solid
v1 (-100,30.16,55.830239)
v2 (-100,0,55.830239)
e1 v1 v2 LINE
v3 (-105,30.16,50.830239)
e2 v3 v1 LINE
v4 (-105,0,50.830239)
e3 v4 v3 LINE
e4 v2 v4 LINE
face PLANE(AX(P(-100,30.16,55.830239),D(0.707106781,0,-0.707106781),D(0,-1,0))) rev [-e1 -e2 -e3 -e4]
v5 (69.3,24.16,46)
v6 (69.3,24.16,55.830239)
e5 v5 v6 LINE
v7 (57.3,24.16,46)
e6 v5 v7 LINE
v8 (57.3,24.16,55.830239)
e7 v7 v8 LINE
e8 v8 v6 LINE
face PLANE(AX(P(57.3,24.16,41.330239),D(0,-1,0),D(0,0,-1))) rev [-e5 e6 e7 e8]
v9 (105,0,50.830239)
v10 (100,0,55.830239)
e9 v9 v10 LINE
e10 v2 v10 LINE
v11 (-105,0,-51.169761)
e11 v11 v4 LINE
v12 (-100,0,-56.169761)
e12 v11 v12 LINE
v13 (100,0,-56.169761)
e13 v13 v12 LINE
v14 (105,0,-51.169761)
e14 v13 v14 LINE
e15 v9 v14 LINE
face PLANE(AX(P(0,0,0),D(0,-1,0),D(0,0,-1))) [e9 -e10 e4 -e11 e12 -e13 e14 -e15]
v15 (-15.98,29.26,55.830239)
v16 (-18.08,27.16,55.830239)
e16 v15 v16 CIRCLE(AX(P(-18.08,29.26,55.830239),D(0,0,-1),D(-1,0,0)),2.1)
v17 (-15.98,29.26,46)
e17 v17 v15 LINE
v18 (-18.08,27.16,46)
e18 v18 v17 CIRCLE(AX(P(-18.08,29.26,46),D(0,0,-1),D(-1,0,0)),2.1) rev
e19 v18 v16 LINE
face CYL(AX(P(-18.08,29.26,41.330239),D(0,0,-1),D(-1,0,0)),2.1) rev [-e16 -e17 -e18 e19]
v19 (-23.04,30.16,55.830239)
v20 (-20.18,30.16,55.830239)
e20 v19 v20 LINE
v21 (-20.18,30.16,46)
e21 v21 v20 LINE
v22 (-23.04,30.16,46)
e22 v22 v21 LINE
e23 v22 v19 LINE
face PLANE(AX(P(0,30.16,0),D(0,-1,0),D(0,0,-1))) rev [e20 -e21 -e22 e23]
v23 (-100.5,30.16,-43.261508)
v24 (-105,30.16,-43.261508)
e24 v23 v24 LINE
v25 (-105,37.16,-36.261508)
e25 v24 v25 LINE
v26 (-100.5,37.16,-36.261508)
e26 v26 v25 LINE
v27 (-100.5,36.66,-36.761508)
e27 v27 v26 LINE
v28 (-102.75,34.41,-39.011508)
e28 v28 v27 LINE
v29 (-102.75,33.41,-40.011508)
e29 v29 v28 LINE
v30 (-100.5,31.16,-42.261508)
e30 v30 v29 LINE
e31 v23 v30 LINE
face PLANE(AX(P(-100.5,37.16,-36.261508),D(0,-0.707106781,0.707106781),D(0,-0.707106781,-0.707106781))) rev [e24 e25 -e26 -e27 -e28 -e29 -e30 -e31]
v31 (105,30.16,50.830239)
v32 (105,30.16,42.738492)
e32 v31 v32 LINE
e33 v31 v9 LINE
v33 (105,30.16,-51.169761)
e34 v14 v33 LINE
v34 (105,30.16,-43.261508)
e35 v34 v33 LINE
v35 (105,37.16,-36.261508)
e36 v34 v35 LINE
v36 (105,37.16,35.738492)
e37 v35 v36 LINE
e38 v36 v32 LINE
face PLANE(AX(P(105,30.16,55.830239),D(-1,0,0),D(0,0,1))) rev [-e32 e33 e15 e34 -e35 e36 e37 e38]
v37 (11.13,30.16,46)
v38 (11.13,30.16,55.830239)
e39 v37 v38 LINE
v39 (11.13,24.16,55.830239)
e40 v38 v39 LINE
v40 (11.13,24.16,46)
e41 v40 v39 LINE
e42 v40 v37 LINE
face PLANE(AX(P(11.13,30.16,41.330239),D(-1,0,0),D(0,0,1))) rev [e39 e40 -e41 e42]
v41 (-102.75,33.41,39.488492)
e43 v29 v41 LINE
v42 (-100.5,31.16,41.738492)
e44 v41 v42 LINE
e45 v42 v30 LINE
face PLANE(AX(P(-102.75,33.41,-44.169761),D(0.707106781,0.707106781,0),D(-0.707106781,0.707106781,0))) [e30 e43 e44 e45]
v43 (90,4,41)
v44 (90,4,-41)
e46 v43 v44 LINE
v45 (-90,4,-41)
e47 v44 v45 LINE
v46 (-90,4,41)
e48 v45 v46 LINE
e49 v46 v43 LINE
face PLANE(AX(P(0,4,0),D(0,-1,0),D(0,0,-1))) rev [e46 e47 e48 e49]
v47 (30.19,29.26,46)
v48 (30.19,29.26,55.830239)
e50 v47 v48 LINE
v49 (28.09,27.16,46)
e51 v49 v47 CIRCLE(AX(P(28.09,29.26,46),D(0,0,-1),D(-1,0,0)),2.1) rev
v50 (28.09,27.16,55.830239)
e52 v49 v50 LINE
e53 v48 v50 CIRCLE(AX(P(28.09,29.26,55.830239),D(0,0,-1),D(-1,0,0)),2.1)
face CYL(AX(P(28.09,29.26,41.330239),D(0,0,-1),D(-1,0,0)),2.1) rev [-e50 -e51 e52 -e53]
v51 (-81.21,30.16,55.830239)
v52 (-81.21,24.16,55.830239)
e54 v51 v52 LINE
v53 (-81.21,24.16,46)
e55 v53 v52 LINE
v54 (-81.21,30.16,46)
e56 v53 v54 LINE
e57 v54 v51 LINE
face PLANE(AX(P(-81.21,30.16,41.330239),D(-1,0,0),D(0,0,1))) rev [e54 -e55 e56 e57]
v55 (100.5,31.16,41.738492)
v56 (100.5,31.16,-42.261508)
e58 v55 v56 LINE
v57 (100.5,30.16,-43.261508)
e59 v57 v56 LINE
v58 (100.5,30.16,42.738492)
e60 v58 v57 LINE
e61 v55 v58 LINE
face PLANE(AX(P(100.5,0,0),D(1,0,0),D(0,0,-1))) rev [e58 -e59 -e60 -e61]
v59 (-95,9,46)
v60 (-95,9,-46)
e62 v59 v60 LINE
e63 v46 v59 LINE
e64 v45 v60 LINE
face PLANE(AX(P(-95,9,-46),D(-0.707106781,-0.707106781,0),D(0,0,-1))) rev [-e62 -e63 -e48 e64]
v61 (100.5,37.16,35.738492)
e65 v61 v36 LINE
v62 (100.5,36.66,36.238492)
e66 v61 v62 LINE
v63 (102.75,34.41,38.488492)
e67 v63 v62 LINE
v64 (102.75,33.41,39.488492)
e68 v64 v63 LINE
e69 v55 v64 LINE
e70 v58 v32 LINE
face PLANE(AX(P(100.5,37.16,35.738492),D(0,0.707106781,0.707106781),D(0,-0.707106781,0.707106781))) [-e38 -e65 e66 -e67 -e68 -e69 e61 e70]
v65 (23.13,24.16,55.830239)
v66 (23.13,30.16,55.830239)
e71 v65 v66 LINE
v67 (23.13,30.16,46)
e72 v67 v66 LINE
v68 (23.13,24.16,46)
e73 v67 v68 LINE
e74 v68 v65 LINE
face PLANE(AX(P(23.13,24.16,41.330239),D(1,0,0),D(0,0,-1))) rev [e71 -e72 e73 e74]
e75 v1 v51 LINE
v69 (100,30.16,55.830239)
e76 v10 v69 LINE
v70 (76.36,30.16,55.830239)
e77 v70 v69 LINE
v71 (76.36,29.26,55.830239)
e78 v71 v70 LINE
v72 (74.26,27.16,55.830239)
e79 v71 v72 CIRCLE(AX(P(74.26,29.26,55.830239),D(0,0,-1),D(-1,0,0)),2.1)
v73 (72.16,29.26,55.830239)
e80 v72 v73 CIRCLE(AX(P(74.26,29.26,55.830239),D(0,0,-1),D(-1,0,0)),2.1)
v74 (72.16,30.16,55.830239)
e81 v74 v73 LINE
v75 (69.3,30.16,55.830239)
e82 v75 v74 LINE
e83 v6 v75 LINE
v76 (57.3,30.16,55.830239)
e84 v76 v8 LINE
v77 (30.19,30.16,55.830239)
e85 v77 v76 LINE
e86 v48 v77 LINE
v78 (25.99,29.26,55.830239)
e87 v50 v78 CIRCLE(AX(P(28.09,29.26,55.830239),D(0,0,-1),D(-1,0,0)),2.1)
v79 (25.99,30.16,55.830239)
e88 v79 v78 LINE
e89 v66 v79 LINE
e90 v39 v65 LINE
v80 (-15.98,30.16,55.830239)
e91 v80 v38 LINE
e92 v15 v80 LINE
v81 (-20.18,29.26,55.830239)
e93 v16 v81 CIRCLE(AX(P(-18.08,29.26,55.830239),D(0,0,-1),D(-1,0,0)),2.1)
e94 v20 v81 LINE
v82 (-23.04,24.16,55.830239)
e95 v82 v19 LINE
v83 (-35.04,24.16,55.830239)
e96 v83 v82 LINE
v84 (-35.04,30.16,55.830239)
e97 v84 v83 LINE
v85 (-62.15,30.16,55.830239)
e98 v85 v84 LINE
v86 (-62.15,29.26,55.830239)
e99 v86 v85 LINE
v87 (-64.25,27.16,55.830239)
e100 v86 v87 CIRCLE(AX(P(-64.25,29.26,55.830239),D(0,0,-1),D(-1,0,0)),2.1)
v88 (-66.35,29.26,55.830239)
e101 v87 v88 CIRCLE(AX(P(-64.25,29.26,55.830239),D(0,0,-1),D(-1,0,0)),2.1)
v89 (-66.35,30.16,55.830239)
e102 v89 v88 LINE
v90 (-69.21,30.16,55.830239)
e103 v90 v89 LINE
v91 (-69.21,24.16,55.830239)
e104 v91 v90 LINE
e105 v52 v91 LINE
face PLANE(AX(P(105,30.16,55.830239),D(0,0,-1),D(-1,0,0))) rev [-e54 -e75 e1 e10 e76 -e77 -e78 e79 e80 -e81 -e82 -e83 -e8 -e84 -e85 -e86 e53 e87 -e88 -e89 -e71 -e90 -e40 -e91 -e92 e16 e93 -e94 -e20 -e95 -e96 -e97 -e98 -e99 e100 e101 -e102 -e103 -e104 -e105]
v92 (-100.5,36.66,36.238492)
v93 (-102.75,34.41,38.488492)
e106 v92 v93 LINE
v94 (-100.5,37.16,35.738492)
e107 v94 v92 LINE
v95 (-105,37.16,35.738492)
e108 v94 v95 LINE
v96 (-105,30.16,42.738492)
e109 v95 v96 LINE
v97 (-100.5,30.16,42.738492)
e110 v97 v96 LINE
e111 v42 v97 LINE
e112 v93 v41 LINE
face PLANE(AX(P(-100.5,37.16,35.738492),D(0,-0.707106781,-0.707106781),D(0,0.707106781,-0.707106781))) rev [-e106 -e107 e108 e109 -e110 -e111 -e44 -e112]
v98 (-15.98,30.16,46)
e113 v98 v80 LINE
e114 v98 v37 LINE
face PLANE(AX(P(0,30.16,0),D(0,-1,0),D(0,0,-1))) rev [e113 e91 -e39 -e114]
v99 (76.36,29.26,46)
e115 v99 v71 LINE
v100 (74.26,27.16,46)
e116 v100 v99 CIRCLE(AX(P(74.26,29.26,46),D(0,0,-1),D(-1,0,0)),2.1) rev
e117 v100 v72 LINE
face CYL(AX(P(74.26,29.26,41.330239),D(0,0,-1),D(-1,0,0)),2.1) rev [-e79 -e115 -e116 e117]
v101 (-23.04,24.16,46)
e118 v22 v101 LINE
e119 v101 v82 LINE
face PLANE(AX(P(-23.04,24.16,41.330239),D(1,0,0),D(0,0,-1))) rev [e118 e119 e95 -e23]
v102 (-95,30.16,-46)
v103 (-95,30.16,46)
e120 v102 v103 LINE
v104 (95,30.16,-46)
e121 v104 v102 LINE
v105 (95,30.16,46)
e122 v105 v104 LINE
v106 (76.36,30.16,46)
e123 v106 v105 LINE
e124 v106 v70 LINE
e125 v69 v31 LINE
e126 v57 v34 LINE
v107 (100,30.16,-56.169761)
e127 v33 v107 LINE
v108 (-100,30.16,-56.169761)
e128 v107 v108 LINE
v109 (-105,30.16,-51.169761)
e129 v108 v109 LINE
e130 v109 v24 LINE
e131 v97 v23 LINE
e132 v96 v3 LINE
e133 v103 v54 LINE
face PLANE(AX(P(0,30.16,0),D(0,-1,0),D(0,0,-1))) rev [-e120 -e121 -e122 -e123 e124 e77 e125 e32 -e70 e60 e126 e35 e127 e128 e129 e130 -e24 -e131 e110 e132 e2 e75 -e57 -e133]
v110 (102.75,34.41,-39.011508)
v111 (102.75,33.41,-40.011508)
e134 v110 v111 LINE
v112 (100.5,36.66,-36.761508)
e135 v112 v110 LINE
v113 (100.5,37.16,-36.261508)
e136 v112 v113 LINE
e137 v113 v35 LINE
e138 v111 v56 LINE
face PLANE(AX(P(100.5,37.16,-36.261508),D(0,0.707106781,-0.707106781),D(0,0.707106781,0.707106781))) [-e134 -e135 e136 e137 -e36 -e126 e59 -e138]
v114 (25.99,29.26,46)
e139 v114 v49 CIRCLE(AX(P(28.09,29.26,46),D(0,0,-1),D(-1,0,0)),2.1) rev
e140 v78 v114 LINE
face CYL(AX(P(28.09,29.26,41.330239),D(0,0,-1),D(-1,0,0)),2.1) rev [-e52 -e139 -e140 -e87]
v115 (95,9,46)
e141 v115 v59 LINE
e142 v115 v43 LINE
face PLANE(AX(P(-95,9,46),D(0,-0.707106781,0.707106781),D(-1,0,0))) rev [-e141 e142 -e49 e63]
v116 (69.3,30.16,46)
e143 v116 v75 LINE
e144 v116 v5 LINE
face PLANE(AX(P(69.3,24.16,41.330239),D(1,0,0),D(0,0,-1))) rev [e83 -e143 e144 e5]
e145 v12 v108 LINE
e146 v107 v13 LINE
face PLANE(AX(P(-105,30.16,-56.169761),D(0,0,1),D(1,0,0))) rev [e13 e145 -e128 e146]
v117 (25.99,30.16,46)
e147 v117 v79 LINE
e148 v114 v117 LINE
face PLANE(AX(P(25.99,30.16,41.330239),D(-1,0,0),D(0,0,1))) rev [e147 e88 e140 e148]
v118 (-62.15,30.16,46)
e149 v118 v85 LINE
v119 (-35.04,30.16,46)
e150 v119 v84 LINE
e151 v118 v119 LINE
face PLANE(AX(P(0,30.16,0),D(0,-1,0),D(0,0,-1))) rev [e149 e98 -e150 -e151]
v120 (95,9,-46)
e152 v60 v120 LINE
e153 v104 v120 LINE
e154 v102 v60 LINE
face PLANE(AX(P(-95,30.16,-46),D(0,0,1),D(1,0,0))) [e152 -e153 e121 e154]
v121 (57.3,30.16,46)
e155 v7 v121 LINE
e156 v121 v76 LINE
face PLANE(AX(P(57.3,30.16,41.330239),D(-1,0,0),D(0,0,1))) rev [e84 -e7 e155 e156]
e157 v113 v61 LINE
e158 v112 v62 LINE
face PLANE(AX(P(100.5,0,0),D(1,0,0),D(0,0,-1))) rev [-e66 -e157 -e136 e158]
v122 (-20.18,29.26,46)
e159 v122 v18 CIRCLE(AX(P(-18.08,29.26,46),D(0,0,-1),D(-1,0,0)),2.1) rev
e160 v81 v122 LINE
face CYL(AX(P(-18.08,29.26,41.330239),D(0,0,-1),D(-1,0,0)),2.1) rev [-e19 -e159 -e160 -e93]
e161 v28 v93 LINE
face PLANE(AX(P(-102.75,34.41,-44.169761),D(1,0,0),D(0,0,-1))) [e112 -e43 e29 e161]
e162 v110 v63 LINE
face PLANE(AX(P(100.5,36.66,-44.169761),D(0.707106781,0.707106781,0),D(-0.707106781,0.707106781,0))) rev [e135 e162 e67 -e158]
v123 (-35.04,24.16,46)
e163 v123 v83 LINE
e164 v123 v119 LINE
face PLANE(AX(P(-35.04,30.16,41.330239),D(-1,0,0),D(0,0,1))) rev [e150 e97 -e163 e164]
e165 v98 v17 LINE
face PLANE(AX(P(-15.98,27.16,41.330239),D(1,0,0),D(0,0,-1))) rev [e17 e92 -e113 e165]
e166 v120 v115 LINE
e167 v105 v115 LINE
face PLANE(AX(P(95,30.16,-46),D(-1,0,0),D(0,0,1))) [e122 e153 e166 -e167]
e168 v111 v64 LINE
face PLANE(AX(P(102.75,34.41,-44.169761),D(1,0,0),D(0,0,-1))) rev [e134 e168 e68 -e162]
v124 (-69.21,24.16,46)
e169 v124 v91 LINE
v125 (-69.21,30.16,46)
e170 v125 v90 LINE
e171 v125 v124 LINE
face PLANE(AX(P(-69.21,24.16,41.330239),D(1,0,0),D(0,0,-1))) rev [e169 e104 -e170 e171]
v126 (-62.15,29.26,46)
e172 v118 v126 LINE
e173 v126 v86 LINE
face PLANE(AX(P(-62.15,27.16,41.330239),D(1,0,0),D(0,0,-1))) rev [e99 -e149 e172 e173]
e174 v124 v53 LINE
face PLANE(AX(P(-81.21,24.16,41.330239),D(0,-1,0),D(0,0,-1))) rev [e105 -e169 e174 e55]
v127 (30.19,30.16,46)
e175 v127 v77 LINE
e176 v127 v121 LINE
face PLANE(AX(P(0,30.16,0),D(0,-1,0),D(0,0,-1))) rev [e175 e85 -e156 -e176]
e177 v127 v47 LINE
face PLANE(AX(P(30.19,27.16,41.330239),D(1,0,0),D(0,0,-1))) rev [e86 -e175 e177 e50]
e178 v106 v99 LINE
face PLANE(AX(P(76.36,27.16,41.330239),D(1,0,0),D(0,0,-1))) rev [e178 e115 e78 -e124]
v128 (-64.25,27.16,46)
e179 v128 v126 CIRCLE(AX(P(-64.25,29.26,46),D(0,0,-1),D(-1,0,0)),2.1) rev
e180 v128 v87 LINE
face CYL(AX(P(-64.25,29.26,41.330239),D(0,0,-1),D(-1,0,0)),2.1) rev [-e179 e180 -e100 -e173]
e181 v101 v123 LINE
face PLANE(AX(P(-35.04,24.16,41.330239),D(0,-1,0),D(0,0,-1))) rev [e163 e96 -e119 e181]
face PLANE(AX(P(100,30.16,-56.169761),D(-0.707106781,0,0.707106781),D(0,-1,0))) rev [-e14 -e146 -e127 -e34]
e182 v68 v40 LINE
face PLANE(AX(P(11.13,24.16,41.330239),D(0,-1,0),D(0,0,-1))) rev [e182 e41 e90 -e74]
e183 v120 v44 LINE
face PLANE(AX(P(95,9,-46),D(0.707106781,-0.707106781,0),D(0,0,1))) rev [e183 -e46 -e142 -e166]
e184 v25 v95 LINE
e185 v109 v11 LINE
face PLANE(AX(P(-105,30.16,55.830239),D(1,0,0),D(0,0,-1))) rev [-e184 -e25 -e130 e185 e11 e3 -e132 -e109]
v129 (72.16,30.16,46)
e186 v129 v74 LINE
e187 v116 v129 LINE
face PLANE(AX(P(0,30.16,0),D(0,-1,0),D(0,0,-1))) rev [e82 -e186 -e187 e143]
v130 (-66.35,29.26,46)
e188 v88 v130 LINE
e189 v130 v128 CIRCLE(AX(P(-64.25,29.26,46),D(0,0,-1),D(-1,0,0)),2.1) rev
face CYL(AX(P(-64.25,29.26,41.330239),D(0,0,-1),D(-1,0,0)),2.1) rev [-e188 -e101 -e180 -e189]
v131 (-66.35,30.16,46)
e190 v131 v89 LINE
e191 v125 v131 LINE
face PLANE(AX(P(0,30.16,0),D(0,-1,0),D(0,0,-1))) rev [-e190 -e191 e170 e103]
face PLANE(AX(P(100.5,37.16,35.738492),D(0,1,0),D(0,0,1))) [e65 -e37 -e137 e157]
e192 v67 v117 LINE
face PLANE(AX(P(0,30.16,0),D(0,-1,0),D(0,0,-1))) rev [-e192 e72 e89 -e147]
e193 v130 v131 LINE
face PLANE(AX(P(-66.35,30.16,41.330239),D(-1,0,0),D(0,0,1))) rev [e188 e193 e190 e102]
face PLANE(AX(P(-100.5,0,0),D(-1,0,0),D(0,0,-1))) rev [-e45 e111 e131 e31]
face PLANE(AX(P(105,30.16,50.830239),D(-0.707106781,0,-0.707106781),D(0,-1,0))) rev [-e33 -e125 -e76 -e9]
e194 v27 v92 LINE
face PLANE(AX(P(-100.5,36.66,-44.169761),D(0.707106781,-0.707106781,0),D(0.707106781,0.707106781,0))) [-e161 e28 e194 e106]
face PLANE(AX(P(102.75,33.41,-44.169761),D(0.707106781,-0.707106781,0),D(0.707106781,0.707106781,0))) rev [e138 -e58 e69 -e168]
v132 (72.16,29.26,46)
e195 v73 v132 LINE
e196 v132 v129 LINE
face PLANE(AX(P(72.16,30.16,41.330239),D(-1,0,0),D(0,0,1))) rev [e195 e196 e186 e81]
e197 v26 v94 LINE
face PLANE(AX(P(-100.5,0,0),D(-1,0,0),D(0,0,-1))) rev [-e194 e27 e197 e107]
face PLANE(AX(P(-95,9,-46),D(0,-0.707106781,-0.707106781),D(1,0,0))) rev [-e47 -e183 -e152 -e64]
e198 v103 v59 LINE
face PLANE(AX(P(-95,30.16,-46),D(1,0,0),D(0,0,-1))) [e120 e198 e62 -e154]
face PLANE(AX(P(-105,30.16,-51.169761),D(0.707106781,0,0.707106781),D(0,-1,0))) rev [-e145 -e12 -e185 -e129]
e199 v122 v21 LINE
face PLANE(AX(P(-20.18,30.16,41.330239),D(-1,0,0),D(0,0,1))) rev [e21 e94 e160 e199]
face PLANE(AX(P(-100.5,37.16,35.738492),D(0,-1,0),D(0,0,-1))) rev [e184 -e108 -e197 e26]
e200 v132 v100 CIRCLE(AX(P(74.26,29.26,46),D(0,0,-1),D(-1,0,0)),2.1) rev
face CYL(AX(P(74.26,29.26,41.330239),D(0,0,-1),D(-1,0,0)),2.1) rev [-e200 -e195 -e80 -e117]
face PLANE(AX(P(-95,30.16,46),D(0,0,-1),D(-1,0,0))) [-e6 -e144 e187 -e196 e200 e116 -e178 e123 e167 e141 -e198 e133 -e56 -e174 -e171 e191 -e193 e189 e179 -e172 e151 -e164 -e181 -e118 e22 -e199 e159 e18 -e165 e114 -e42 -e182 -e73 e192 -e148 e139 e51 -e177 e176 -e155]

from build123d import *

# Parameters (mm, degrees)
SKETCH1_W           = 210
SKETCH1_H           = 112
SKETCH1_W_2         = 190
SKETCH1_H_2         = 92
BOSS_EXTRUDE1_DEPTH = 30.16
SKETCH2_W           = 210
SKETCH2_H           = 112
BOSS_EXTRUDE2_DEPTH = 4
BOSS_EXTRUDE3_DEPTH = 4.5
SKETCH5_W           = 12
SKETCH5_H           = 6
CUT_EXTRUDE2_DEPTH  = 14.5
SKETCH6_W           = 4.2
SKETCH6_H           = 3
CUT_EXTRUDE3_DEPTH  = 14.5
CHAMFER1_SIZE       = 5
CHAMFER2_SIZE       = 5
CUT_EXTRUDE4_DEPTH  = 100
FILLET1_R           = 2.1


with BuildPart() as part:
    # Sketch1 → Boss-Extrude1 (new body)
    with BuildSketch(Plane(origin=(0, 0, 0), x_dir=(1, 0, 0), z_dir=(0, 1, 0))):
        with Locations((0, 0.169761006)):
            Rectangle(SKETCH1_W, SKETCH1_H)
        Rectangle(SKETCH1_W_2, SKETCH1_H_2, mode=Mode.SUBTRACT)
    extrude(amount=BOSS_EXTRUDE1_DEPTH)

    # Sketch2 → Boss-Extrude2 (add)
    with BuildSketch(Plane.XZ):
        with Locations((0, -0.169761006)):
            Rectangle(SKETCH2_W, SKETCH2_H)
    extrude(amount=-BOSS_EXTRUDE2_DEPTH)

    # Sketch3 → Boss-Extrude3 (add)
    with BuildSketch(Plane(origin=(105, 0, 0), x_dir=(0, 0, -1), z_dir=(1, 0, 0))):
        Polygon((-42.738491713, 30.16), (43.261508287, 30.16), (36.261508287, 37.16), (-35.738491713, 37.16), align=None)
    boss_extrude3 = extrude(amount=-BOSS_EXTRUDE3_DEPTH)

    # Sketch5 → Cut-Extrude2 (cut)
    with BuildSketch(Plane.XY.offset(55.830238994)):
        with Locations((63.3, 27.16)):
            Rectangle(SKETCH5_W, SKETCH5_H)
        with Locations((17.13, 27.16)):
            Rectangle(SKETCH5_W, SKETCH5_H)
        with Locations((-29.04, 27.16)):
            Rectangle(SKETCH5_W, SKETCH5_H)
        with Locations((-75.21, 27.16)):
            Rectangle(SKETCH5_W, SKETCH5_H)
    extrude(amount=-CUT_EXTRUDE2_DEPTH, mode=Mode.SUBTRACT)

    # Sketch6 → Cut-Extrude3 (cut)
    with BuildSketch(Plane.XY.offset(55.830238994)):
        with Locations((-64.25, 28.66)):
            Rectangle(SKETCH6_W, SKETCH6_H)
        with Locations((-18.08, 28.66)):
            Rectangle(SKETCH6_W, SKETCH6_H)
        with Locations((28.09, 28.66)):
            Rectangle(SKETCH6_W, SKETCH6_H)
        with Locations((74.26, 28.66)):
            Rectangle(SKETCH6_W, SKETCH6_H)
    extrude(amount=-CUT_EXTRUDE3_DEPTH, mode=Mode.SUBTRACT)

    # Chamfer1
    chamfer1_edges = [part.edges().sort_by_distance(p)[0] for p in [
        (0, 4, -46),
        (0, 4, 46),
        (-95, 4, 0),
        (95, 4, 0),
    ]]
    chamfer(chamfer1_edges, length=CHAMFER1_SIZE)

    # Chamfer2
    chamfer2_edges = [part.edges().sort_by_distance(p)[0] for p in [
        (105, 15.08, 55.830238994),
        (-105, 15.08, 55.830238994),
        (-105, 15.08, -56.169761006),
        (105, 15.08, -56.169761006),
    ]]
    chamfer(chamfer2_edges, length=CHAMFER2_SIZE)

    # Sketch7 → Cut-Extrude4 (cut)
    with BuildSketch(Plane.XY.offset(55.830238994)):
        Polygon((100.5, 36.66), (102.75, 34.41), (102.75, 33.41), (100.5, 31.16), align=None)
    cut_extrude4 = extrude(amount=-CUT_EXTRUDE4_DEPTH, mode=Mode.SUBTRACT)

    # Mirror1: Boss-Extrude3, Cut-Extrude4 across plane
    add(boss_extrude3.mirror(Plane(origin=(0, 0, 0), x_dir=(0, 0, 1), z_dir=(1, 0, 0))))
    add(cut_extrude4.mirror(Plane(origin=(0, 0, 0), x_dir=(0, 0, 1), z_dir=(1, 0, 0))), mode=Mode.SUBTRACT)

    # Fillet1
    fillet1_edges = [part.edges().sort_by_distance(p)[0] for p in [
        (76.36, 27.16, 50.915119497),
        (30.19, 27.16, 50.915119497),
        (-15.98, 27.16, 50.915119497),
        (-62.15, 27.16, 50.915119497),
        (72.16, 27.16, 50.915119497),
        (25.99, 27.16, 50.915119497),
        (-20.18, 27.16, 50.915119497),
        (-66.35, 27.16, 50.915119497),
    ]]
    fillet(fillet1_edges, radius=FILLET1_R - 0.0001)  # a hair under: the kernel refuses the full size


solid = part.part
